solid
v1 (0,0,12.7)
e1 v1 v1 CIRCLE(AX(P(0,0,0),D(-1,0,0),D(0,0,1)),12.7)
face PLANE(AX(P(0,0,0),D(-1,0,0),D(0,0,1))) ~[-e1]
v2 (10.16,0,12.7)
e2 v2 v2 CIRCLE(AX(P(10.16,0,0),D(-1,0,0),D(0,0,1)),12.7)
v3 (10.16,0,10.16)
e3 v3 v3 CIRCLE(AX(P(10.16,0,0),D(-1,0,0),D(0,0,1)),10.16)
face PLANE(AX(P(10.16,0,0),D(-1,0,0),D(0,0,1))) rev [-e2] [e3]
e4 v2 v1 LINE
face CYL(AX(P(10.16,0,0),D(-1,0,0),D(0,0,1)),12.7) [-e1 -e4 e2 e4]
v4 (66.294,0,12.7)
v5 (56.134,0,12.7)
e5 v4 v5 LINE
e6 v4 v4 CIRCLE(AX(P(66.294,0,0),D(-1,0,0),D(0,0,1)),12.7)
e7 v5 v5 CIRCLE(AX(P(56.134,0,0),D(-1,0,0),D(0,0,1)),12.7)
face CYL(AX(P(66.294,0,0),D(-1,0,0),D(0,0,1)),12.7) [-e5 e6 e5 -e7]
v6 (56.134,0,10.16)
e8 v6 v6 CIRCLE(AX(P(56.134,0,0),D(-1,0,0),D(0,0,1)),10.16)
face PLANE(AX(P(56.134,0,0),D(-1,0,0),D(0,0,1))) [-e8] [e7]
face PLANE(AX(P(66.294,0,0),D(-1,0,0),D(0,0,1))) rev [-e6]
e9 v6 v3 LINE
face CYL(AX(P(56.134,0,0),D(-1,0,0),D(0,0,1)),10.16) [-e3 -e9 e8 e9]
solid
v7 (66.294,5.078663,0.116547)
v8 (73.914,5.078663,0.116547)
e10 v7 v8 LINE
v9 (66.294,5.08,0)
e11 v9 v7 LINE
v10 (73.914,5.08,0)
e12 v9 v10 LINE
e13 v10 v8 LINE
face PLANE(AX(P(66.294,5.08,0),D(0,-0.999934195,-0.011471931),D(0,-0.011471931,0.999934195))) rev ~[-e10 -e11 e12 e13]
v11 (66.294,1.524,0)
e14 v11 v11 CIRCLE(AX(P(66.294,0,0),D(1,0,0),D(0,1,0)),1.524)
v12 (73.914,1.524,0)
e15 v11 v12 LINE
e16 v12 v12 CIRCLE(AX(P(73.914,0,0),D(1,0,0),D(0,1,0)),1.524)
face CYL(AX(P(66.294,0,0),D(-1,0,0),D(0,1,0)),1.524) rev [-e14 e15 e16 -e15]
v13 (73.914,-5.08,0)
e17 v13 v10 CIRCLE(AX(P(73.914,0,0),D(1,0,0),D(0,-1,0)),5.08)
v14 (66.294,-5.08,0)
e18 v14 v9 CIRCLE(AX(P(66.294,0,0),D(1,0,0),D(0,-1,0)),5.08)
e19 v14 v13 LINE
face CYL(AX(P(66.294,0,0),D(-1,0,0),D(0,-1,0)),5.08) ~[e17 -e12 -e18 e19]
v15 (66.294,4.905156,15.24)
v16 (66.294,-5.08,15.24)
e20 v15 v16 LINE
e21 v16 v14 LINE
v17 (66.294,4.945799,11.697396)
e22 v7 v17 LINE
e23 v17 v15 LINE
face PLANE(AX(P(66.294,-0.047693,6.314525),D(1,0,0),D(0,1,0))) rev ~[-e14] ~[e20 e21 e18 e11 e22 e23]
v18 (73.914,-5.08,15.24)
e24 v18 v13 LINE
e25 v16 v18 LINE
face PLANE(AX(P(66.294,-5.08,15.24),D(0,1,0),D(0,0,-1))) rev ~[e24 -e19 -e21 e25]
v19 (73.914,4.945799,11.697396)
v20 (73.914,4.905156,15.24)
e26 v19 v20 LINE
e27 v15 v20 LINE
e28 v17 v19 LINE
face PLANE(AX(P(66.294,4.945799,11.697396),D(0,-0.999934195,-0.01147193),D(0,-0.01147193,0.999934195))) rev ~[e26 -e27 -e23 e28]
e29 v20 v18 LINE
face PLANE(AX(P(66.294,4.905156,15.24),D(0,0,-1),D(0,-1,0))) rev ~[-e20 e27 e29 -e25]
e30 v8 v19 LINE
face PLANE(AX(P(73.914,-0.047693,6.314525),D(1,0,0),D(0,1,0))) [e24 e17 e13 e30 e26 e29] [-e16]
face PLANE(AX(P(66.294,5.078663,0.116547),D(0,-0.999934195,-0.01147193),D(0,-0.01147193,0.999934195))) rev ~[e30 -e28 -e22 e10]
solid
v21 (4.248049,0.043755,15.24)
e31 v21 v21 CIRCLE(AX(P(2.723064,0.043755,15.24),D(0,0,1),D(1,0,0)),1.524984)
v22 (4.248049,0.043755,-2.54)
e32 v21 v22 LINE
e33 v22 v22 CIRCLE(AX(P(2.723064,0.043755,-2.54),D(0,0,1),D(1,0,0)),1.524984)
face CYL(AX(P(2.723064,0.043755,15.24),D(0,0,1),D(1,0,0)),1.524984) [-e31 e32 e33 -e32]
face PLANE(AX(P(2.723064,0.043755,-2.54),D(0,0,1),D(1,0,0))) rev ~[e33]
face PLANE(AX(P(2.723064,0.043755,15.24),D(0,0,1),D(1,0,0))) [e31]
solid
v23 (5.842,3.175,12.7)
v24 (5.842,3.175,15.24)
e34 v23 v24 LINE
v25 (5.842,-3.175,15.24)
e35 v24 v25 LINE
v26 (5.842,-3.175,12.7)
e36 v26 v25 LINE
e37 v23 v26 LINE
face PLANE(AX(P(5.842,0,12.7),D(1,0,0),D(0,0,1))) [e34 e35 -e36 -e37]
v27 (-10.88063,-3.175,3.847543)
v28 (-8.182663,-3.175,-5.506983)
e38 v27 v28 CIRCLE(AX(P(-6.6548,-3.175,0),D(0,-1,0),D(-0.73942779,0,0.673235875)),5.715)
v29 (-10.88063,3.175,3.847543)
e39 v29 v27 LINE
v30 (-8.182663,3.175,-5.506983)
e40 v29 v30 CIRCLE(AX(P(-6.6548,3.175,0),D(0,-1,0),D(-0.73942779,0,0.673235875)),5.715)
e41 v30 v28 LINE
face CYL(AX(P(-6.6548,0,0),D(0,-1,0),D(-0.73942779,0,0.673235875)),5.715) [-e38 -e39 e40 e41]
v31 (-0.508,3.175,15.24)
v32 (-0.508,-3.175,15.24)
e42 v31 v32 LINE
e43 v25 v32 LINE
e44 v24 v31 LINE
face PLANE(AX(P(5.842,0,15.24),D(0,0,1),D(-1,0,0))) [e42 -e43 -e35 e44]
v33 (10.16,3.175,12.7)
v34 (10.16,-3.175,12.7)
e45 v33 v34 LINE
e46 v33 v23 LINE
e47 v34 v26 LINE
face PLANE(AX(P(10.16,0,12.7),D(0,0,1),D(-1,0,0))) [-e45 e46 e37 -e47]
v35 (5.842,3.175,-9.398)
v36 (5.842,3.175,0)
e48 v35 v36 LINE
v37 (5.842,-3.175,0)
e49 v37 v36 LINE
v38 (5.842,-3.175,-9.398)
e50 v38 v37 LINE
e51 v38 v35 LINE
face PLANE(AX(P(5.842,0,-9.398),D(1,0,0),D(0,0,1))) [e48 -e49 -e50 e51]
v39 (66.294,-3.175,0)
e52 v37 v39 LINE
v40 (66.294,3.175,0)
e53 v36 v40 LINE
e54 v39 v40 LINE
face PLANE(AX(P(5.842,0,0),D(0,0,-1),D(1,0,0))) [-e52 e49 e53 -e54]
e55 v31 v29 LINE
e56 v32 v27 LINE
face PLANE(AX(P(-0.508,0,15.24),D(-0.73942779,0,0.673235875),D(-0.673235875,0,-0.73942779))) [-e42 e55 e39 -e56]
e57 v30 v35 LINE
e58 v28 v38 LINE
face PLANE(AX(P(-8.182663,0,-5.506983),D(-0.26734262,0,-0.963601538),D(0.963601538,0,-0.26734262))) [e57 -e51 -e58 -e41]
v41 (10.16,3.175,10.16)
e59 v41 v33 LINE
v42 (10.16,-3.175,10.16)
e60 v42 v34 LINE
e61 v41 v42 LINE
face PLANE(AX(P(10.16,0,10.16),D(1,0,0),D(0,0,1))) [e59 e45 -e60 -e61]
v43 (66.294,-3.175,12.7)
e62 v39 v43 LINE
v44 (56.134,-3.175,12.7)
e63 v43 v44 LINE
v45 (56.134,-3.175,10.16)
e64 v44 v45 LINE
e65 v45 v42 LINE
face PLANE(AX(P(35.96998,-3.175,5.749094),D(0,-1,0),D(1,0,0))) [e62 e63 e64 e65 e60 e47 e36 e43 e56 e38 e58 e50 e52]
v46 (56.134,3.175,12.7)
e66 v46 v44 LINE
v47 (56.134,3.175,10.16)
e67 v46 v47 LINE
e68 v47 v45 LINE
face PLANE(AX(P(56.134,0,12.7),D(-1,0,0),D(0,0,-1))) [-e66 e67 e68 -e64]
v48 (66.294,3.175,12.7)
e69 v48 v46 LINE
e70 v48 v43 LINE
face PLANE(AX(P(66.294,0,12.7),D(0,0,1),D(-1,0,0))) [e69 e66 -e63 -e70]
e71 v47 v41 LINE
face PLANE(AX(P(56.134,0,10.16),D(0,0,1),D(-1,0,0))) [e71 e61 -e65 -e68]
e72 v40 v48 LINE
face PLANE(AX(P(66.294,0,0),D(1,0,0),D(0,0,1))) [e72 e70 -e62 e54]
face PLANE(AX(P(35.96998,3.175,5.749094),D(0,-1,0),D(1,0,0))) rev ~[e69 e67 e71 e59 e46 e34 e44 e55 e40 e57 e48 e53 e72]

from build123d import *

# Parameters (mm, degrees)
F0_W     = 5.842
F0_H     = 12.7
F0_R     = 3.175
F2_DEPTH = 3.175
F3_R     = 1.524
F4_DEPTH = 7.62
F6_R     = 1.524984407
F7_DEPTH = 17.78
F5_R     = 1.524
F8_DEPTH = 10.414


with BuildPart() as f1:
    # F0 (on Front) → F1 (revolve)
    with BuildSketch(Plane.XZ):
        Polygon((5.842, 12.7), (5.842, 0), (66.294, 0), (66.294, 12.7), (56.134, 12.7), (56.134, 10.16), (10.16, 10.16), (10.16, 12.7), align=None)
        with Locations((2.921, 6.35)):
            Rectangle(F0_W, F0_H)
    revolve(axis=Axis((33.147, 0, 0), (-1, 0, 0)))


with BuildPart() as f2:
    # F0 (on Front) → F2 (new body, symmetric)
    with BuildSketch(Plane.XZ):
        Polygon((5.842, 12.7), (5.842, 0), (66.294, 0), (66.294, 12.7), (56.134, 12.7), (56.134, 10.16), (10.16, 10.16), (10.16, 12.7), align=None)
        with BuildLine():
            ThreePointArc((-8.1826630726, -5.5069827884), (-3.1957909266, -4.5493385486), (-0.9398, 0))
            ThreePointArc((-0.9398, 0), (-4.5919612295, 5.3297205562), (-10.8806298187, 3.8475430269))
            ThreePointArc((-10.8806298187, 3.8475430269), (-12.1459778134, -1.5837270034), (-8.1826630726, -5.5069827884))
        make_face()
        with Locations((-6.6548, 0)):
            Circle(F0_R, mode=Mode.SUBTRACT)
        with BuildLine():
            Line((-0.9398, 0), (0, 0))
            Line((0, 0), (0, 12.7))
            Line((0, 12.7), (5.842, 12.7))
            Line((5.842, 12.7), (5.842, 15.24))
            Line((5.842, 15.24), (-0.508, 15.24))
            Line((-0.508, 15.24), (-10.8806298187, 3.8475430269))
            ThreePointArc((-10.8806298187, 3.8475430269), (-4.5919612295, 5.3297205562), (-0.9398, 0))
        make_face()
        with Locations((2.921, 6.35)):
            Rectangle(F0_W, F0_H)
        with BuildLine():
            Line((5.842, 0), (0, 0))
            Line((0, 0), (-0.9398, 0))
            ThreePointArc((-0.9398, 0), (-3.1957909266, -4.5493385486), (-8.1826630726, -5.5069827884))
            Line((-8.1826630726, -5.5069827884), (5.842, -9.398))
            Line((5.842, -9.398), (5.842, 0))
        make_face()
        with Locations((-6.6548, 0)):
            Circle(F0_R)
    extrude(amount=F2_DEPTH, both=True)


with BuildPart() as f4:
    # F3 (on face) → F4 (new body)
    with BuildSketch(Plane.YZ.offset(66.294)):
        with BuildLine():
            Line((-5.08, 11.6397422652), (-5.08, 0))
            ThreePointArc((-5.08, 0), (-0.0582774056, 5.0796657118), (5.0786628913, 0.1165471414))
            Line((5.0786628913, 0.1165471414), (4.9457994608, 11.6973957655))
            ThreePointArc((4.9457994608, 11.6973957655), (-0.0730303205, 12.6997900208), (-5.08, 11.6397422652))
        make_face()
        with BuildLine():
            Line((-5.08, 15.24), (-5.08, 11.6397422652))
            ThreePointArc((-5.08, 11.6397422652), (-0.0730303205, 12.6997900208), (4.9457994608, 11.6973957655))
            Line((4.9457994608, 11.6973957655), (4.9051562776, 15.24))
            Line((4.9051562776, 15.24), (-5.08, 15.24))
        make_face()
        with BuildLine():
            ThreePointArc((5.0786628913, 0.1165471414), (-0.0582774056, 5.0796657118), (-5.08, 0))
            ThreePointArc((-5.08, 0), (0, -5.08), (5.08, 0))
            Line((5.08, 0), (5.0786628913, 0.1165471414))
        make_face()
        Circle(F3_R, mode=Mode.SUBTRACT)
    extrude(amount=F4_DEPTH)

    # F5 (on face) → F8 (join)
    with BuildSketch(Plane.XY.offset(15.24)):
        with Locations((69.7052180767, 0.1330839295)):
            Circle(F5_R)
    extrude(amount=-F8_DEPTH)


with BuildPart() as f7:
    # F6 (on face) → F7 (new body)
    with BuildSketch(Plane.XY.offset(15.24)):
        with Locations((2.7230642736, 0.0437548333)):
            Circle(F6_R)
    extrude(amount=-F7_DEPTH)


solid = Compound([f1.part, f2.part, f4.part, f7.part])
